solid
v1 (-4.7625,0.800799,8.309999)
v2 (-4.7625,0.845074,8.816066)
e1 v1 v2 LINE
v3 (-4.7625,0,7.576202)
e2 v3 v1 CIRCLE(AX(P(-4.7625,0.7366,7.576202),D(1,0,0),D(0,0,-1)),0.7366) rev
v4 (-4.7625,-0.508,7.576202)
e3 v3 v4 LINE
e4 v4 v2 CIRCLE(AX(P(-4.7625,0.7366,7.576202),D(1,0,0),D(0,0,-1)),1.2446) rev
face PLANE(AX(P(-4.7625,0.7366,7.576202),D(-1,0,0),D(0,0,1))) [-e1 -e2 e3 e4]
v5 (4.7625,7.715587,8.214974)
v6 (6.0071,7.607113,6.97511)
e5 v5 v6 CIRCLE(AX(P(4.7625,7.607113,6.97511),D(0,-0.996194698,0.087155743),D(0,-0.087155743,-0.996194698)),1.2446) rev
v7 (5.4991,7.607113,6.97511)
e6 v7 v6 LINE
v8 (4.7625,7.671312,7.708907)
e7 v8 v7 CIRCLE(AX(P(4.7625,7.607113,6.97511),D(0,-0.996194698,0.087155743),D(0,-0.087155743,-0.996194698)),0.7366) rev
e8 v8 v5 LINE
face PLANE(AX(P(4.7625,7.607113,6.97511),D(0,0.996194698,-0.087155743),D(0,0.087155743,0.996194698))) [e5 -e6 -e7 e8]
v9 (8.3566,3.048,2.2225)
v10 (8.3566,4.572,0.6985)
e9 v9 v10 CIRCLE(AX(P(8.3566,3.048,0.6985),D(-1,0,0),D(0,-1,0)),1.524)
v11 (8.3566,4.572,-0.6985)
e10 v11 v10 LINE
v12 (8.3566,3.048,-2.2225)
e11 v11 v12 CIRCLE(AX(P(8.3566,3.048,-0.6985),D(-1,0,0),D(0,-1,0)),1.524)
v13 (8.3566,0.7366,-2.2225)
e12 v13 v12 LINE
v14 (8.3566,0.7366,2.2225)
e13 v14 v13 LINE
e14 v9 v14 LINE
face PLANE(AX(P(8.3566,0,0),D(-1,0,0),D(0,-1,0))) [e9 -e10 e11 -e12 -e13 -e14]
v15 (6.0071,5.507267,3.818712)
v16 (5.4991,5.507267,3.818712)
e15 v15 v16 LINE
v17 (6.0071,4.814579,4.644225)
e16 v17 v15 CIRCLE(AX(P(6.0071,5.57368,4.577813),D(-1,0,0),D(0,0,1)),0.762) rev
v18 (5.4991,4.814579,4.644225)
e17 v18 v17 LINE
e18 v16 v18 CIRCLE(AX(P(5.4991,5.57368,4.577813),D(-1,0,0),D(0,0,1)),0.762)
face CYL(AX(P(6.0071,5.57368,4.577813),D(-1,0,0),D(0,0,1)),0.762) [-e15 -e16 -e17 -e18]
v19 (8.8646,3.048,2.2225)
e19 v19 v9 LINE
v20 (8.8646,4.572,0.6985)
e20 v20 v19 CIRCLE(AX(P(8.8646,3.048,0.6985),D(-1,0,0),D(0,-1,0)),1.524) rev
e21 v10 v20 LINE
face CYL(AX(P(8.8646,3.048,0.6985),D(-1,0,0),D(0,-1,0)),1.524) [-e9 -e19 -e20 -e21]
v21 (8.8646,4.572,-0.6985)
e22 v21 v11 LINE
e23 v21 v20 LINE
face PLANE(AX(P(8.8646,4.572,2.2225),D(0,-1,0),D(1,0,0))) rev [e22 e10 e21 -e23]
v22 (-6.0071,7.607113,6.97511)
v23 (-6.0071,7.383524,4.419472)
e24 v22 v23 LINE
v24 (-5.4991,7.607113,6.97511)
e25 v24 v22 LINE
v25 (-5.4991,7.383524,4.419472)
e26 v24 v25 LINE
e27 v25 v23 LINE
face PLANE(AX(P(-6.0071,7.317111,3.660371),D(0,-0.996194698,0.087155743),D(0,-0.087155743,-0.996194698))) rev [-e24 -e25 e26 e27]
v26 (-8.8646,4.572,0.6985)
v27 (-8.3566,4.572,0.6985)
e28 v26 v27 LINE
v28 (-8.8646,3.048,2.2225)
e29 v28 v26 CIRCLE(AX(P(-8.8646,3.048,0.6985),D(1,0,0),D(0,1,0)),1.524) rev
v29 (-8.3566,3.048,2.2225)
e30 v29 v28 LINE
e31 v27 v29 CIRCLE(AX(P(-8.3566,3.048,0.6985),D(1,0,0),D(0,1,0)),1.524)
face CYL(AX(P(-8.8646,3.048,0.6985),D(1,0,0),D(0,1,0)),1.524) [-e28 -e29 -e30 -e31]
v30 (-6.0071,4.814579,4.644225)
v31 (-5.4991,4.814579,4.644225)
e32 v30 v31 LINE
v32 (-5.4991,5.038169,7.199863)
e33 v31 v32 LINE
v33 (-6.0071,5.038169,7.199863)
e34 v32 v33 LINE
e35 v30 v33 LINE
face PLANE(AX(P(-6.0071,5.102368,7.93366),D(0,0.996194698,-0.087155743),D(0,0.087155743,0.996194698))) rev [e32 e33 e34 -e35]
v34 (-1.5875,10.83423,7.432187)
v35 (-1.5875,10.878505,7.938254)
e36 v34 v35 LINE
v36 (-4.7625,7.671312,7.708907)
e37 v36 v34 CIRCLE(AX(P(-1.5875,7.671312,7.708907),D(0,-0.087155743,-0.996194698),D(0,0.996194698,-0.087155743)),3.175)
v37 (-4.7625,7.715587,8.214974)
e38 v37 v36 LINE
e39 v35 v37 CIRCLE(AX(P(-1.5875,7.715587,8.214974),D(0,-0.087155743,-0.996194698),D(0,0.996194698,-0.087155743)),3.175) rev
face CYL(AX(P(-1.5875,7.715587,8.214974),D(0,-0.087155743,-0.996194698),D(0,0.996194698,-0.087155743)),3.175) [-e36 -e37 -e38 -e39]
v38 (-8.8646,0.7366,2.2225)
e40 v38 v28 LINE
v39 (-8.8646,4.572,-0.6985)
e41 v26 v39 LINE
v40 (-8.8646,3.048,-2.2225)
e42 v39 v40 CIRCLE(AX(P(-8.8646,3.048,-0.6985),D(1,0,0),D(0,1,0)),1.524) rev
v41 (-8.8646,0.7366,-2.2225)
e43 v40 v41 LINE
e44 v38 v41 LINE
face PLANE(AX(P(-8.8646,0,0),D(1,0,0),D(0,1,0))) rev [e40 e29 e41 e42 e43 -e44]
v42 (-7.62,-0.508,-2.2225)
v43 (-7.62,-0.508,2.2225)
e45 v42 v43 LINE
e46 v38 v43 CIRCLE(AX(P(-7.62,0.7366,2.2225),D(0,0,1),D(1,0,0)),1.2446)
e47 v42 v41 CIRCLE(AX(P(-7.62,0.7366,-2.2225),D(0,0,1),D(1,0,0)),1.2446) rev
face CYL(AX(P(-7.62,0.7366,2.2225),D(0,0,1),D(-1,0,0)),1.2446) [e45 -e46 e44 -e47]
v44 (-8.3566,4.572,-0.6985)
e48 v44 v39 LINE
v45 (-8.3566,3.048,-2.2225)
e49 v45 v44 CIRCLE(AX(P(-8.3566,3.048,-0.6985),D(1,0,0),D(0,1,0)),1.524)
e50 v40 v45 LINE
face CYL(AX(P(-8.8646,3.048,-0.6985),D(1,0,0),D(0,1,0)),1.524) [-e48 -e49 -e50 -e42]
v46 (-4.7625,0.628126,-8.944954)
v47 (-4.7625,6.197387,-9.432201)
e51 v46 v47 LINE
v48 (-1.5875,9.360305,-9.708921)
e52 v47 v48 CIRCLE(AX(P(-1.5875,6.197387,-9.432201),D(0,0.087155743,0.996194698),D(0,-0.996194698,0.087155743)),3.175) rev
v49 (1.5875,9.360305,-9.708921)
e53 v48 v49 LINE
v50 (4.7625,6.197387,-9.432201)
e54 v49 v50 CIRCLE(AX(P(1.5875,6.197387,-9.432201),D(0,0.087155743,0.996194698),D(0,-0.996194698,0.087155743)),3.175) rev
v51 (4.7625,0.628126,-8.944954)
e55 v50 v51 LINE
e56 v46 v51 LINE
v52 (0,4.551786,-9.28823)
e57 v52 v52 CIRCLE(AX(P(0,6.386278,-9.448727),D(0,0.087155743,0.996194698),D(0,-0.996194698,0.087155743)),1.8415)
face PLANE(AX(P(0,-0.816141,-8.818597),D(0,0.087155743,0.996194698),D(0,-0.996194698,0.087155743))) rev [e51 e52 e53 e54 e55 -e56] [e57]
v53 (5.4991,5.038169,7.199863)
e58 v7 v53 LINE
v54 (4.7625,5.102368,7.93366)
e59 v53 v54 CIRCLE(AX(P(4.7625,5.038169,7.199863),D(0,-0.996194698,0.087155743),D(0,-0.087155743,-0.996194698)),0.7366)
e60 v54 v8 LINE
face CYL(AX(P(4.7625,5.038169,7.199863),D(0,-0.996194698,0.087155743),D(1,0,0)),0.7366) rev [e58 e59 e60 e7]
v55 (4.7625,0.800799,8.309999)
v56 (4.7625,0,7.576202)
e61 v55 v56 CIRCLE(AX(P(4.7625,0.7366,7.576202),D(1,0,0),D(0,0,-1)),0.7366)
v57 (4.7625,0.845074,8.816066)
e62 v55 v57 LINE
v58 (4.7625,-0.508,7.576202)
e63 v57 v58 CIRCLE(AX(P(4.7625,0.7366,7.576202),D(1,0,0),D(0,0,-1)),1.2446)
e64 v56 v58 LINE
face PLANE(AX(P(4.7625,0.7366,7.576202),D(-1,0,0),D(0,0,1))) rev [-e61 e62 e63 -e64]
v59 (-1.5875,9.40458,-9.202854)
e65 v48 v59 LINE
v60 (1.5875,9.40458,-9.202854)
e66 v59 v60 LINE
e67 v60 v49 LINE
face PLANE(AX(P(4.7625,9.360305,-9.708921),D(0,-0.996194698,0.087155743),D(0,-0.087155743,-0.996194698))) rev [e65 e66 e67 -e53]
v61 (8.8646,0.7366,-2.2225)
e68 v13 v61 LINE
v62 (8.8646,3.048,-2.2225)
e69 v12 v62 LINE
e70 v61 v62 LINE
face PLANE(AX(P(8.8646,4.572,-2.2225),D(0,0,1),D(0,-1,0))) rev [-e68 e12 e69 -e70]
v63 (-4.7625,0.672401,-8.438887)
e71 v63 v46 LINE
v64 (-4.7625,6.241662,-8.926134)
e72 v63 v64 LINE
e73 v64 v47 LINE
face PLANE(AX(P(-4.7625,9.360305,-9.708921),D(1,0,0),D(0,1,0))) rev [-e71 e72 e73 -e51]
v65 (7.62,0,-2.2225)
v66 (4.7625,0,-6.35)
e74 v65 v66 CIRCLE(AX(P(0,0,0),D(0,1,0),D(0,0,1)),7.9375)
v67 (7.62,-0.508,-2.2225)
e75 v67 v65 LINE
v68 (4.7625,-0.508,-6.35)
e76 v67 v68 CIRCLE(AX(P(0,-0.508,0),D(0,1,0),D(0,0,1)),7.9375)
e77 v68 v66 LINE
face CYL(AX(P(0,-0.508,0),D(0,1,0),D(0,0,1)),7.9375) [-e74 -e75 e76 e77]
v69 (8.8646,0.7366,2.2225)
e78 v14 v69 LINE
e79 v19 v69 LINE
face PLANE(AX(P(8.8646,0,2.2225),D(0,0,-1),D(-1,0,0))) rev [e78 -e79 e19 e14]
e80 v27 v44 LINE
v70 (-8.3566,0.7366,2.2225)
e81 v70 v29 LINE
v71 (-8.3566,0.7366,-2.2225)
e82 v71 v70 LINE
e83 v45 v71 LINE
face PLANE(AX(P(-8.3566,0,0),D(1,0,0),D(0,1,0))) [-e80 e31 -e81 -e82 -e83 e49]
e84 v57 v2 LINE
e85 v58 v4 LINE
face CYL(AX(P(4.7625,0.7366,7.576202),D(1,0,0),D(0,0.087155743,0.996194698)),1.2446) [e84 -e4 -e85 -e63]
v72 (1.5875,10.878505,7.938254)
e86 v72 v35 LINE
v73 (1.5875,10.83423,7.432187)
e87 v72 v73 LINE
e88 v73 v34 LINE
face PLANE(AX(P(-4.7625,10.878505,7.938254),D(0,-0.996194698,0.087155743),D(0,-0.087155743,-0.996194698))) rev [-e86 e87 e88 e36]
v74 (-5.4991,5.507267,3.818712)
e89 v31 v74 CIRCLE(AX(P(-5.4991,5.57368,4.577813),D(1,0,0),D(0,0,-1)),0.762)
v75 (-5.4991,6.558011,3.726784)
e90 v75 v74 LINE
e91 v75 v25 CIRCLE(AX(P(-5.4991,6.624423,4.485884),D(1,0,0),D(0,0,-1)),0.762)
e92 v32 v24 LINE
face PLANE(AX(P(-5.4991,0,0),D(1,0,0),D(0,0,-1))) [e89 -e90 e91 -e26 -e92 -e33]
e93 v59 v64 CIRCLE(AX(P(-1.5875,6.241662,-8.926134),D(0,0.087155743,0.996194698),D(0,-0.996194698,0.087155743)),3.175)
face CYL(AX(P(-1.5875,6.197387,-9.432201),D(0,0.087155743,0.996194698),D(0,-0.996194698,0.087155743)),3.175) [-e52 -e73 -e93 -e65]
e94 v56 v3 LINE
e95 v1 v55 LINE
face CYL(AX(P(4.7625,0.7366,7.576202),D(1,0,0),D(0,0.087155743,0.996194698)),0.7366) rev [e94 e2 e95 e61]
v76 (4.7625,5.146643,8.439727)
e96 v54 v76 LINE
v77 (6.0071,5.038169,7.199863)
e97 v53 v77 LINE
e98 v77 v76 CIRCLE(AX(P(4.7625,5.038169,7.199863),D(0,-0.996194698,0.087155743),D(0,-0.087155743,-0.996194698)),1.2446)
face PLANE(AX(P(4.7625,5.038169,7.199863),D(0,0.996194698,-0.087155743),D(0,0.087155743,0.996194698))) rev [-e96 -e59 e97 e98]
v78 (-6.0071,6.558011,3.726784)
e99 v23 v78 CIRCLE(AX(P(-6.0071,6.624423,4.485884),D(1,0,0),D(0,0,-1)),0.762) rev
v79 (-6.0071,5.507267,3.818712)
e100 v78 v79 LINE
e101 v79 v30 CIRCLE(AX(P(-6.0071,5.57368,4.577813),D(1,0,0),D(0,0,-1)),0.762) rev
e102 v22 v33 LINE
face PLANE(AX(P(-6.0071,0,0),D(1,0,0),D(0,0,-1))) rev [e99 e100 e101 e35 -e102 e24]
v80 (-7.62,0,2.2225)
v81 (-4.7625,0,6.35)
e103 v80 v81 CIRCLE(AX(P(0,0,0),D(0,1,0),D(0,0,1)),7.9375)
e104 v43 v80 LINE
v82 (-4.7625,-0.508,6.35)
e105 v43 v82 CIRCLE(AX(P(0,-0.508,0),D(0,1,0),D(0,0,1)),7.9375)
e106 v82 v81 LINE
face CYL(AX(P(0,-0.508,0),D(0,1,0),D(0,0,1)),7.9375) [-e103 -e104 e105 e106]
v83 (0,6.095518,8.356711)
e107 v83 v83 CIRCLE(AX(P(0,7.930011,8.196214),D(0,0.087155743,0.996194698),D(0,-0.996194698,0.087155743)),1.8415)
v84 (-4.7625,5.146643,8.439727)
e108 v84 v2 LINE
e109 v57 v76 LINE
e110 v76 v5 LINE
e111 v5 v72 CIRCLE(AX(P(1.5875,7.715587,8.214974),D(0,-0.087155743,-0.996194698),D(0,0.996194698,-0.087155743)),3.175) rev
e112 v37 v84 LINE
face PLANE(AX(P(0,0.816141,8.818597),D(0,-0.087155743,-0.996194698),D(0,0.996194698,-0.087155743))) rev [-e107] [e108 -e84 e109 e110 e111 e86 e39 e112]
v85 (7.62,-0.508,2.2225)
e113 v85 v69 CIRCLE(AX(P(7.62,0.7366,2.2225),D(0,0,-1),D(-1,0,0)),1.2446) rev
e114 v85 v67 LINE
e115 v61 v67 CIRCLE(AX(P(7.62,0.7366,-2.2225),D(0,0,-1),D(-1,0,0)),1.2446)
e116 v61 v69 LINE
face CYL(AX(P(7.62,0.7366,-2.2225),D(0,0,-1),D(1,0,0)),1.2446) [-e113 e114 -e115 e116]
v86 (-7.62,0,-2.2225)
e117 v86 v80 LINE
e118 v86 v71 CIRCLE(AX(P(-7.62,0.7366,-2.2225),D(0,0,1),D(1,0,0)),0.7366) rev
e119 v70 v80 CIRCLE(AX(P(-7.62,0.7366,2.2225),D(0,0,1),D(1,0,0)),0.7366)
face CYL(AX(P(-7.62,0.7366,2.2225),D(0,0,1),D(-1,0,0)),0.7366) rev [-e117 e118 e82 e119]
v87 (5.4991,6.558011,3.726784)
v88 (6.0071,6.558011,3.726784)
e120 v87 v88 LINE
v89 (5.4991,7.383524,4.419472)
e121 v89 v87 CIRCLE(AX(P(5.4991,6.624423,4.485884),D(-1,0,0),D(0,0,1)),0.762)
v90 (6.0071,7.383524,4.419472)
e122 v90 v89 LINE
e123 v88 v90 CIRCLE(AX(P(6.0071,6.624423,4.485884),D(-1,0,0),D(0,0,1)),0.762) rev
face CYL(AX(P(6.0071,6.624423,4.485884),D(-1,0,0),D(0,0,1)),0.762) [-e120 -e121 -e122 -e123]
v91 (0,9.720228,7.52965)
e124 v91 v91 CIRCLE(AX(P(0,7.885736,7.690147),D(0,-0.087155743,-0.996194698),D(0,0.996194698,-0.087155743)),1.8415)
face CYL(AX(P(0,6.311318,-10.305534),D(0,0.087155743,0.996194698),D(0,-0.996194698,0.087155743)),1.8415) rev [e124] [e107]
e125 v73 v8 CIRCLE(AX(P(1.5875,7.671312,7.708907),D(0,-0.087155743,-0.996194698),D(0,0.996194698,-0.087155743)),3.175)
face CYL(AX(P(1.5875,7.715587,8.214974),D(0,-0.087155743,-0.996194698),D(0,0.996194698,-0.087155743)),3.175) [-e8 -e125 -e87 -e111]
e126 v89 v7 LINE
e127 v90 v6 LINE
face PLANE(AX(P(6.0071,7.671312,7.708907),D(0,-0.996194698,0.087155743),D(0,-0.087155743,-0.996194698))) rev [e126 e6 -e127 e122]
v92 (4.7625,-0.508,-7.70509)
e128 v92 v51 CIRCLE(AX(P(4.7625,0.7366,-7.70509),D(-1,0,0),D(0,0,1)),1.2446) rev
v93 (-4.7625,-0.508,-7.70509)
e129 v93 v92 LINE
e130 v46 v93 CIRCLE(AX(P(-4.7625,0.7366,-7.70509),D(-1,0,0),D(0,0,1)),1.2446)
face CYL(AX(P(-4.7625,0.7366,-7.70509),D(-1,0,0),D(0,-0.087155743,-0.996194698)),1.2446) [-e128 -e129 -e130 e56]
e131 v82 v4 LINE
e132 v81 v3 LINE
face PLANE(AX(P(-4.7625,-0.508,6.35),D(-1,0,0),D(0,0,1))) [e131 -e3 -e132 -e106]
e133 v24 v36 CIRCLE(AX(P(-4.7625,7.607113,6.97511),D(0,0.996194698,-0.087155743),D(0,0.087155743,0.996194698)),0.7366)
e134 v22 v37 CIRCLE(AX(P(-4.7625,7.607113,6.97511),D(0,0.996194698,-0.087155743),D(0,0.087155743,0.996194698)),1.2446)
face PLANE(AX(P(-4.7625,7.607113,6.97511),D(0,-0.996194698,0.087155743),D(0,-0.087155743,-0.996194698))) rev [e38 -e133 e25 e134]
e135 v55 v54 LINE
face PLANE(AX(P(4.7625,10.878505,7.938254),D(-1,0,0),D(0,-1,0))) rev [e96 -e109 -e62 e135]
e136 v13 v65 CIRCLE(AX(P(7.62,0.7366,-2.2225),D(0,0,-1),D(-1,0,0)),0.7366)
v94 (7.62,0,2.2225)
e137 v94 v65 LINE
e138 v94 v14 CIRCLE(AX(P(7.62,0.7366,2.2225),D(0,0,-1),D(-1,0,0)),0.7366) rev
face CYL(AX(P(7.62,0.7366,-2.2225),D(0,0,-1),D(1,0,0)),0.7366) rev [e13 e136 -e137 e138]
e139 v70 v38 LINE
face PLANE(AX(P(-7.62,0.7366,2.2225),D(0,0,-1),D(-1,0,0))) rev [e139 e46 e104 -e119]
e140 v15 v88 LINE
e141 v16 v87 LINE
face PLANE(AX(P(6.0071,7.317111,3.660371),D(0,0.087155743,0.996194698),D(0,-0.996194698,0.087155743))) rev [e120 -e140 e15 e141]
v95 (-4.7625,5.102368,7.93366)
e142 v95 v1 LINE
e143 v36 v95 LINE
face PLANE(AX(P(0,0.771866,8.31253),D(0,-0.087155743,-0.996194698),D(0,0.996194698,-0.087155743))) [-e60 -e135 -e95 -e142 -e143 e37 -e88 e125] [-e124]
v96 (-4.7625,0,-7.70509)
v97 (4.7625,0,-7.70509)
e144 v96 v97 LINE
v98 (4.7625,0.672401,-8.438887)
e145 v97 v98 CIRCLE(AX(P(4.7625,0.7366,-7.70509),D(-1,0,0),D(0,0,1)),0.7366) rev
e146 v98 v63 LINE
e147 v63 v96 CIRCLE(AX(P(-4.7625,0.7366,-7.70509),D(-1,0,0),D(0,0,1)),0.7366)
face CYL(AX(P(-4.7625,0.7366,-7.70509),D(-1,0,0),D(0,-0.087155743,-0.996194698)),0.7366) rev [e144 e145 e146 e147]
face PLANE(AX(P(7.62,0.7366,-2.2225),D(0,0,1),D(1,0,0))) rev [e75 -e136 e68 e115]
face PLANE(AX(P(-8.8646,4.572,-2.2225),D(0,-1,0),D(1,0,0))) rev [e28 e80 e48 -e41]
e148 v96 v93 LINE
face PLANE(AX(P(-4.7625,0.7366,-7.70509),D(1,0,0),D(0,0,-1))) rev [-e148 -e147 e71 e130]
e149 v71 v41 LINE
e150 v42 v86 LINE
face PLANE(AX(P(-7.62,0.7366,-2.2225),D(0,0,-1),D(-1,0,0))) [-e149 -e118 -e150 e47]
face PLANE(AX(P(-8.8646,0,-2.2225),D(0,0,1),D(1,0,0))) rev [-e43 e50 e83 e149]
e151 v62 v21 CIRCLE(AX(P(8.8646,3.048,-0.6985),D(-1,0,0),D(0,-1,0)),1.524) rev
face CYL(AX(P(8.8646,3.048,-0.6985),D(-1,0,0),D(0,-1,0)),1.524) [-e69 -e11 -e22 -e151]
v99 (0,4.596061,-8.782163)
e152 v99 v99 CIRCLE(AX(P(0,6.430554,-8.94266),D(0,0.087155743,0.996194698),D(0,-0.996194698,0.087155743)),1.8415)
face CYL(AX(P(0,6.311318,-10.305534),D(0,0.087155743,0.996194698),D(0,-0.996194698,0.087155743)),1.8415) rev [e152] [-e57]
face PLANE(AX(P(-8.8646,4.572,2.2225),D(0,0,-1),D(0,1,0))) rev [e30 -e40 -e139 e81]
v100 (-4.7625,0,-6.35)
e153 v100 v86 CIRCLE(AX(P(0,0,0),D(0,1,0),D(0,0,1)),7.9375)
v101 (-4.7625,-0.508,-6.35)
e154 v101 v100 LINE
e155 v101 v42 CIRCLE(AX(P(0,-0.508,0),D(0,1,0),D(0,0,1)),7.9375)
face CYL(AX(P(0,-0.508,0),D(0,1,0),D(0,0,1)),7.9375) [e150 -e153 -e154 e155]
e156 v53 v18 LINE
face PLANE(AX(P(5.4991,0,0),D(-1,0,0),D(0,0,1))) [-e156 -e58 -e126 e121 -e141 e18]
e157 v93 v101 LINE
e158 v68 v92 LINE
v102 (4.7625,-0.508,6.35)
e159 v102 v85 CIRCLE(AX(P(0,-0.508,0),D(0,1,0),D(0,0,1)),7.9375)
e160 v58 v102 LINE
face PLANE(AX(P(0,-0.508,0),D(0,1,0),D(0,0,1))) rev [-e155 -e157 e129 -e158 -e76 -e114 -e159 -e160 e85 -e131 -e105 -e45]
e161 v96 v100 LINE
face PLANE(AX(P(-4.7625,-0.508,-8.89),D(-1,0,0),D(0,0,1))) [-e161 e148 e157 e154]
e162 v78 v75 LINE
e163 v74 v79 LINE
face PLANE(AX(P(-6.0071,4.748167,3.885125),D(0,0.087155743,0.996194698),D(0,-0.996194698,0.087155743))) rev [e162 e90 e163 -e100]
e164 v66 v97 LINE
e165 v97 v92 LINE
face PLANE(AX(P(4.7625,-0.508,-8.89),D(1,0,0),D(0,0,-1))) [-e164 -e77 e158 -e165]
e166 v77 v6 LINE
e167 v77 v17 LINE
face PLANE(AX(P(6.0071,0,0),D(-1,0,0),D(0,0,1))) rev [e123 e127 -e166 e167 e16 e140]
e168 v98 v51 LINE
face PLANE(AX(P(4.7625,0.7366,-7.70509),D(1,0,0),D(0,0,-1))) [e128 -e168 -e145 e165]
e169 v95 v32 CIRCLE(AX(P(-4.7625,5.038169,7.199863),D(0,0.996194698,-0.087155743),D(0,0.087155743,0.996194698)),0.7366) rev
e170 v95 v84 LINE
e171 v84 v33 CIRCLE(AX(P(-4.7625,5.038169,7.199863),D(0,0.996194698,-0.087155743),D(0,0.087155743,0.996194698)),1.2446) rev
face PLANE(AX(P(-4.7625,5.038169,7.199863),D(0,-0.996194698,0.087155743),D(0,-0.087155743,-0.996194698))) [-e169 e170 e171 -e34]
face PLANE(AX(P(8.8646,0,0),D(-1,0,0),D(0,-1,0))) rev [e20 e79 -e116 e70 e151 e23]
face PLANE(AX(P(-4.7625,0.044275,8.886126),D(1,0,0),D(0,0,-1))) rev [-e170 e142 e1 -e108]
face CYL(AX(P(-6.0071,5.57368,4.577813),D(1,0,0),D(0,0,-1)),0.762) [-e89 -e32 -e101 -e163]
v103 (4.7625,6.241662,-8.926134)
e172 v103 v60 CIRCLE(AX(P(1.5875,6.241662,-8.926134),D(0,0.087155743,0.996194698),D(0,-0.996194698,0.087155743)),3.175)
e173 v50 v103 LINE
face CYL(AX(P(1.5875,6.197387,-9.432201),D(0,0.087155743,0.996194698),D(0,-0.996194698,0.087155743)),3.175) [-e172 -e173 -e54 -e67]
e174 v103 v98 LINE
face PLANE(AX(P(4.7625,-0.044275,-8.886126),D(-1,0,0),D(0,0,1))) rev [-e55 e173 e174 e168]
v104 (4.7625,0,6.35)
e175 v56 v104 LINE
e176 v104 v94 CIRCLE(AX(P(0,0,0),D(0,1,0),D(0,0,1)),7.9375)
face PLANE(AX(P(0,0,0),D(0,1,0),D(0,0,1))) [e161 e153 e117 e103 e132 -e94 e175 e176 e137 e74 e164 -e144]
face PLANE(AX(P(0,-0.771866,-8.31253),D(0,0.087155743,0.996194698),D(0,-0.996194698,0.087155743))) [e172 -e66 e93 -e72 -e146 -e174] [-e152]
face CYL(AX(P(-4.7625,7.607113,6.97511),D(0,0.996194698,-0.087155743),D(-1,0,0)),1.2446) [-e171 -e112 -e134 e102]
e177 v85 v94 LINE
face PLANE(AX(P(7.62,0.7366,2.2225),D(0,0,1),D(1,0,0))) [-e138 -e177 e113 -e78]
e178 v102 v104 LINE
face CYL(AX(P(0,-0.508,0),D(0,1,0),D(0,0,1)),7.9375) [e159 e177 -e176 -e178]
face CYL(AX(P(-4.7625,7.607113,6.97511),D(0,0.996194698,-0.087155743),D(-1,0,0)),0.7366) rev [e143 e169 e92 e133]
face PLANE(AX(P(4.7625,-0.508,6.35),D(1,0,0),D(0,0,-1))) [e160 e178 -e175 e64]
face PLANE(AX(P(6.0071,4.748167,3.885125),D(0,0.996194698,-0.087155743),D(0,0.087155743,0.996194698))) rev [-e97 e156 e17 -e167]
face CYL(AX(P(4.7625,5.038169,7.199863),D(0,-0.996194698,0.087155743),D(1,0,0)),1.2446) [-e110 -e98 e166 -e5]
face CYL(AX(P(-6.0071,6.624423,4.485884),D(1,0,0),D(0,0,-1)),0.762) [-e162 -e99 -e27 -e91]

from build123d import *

# Parameters (mm, degrees)
BASE_FLANGE1_DEPTH      = 0.508
EDGE_FLANGE2_START      = -4.7625
EDGE_FLANGE2_DEPTH      = 9.525
EDGE_FLANGE2_2_DEPTH    = 9.525
EDGE_FLANGE3_START      = -4.7625
EDGE_FLANGE3_DEPTH      = 9.525
EDGE_FLANGE3_2_DEPTH    = 9.525
FILLET1_R               = 3.175
SKETCH17_R              = 1.8415
CUT_EXTRUDE1_DEPTH      = 23.441501951
EDGE_FLANGE4_DEPTH      = 4.445
EDGE_FLANGE4_BEND_DEPTH = 4.445
FILLET2_R               = 1.524
EDGE_FLANGE5_DEPTH      = 2.57875744
EDGE_FLANGE5_BEND_DEPTH = 2.57875744
FILLET3_R               = 0.762


# Read off the part's stored shape, not the designer's step: Edge-Flange2, Edge-Flange3
# Sheet-metal steps are written as plain solids
with BuildPart() as part:
    # Sketch1 → Base-Flange1 (new body)
    with BuildSketch(Plane(origin=(0, 0, 0), x_dir=(1, 0, 0), z_dir=(0, 1, 0))):
        with BuildLine():
            Line((-4.7625, -6.35), (-4.7625, -8.89))
            Line((-4.7625, -8.89), (4.7625, -8.89))
            Line((4.7625, -8.89), (4.7625, -6.35))
            ThreePointArc((4.7625, -6.35), (6.526150521, -4.518104207), (7.62, -2.2225))
            Line((7.62, -2.2225), (7.62, 2.2225))
            ThreePointArc((7.62, 2.2225), (6.526150521, 4.518104207), (4.7625, 6.35))
            Line((4.7625, 6.35), (4.7625, 8.89))
            Line((4.7625, 8.89), (-4.7625, 8.89))
            Line((-4.7625, 8.89), (-4.7625, 6.35))
            ThreePointArc((-4.7625, 6.35), (-6.526150521, 4.518104207), (-7.62, 2.2225))
            Line((-7.62, 2.2225), (-7.62, -2.2225))
            ThreePointArc((-7.62, -2.2225), (-6.526150521, -4.518104207), (-4.7625, -6.35))
        make_face()
    extrude(amount=-BASE_FLANGE1_DEPTH)

    # Edge-Flange2 outline → Edge-Flange2 (cut)
    with BuildSketch(Plane.YZ.offset(EDGE_FLANGE2_START)):
        with BuildLine():
            Line((0, -8.89), (0, -8.708309596))
            ThreePointArc((0, -8.708309596), (-0.373760644, -8.267342948), (-0.508, -7.70508998))
            Line((-0.508, -7.70508998), (-0.508, -8.89))
            Line((-0.508, -8.89), (0, -8.89))
        make_face()
    extrude(amount=EDGE_FLANGE2_DEPTH, mode=Mode.SUBTRACT)

    # Edge-Flange2 2 outline → Edge-Flange2 2 (add)
    with BuildSketch(Plane.YZ.offset(EDGE_FLANGE2_START)):
        with BuildLine():
            ThreePointArc((0, -8.708309596), (0.297808861, -8.869775128), (0.628125963, -8.944953901))
            Line((0.628125963, -8.944953901), (9.360304679, -9.708920547))
            Line((9.360304679, -9.708920547), (9.404579797, -9.20285364))
            Line((9.404579797, -9.20285364), (0.67240108, -8.438886994))
            ThreePointArc((0.67240108, -8.438886994), (0.193521514, -8.202729727), (0, -7.70508998))
            Line((0, -7.70508998), (0, -8.708309596))
        make_face()
    extrude(amount=EDGE_FLANGE2_2_DEPTH)

    # Edge-Flange3 outline → Edge-Flange3 (cut)
    with BuildSketch(Plane.YZ.offset(EDGE_FLANGE3_START)):
        with BuildLine():
            ThreePointArc((-0.508, 7.576201681), (-0.373760644, 8.138454649), (0, 8.579421297))
            Line((0, 8.579421297), (0, 8.89))
            Line((0, 8.89), (-0.508, 8.89))
            Line((-0.508, 8.89), (-0.508, 7.576201681))
        make_face()
    extrude(amount=EDGE_FLANGE3_DEPTH, mode=Mode.SUBTRACT)

    # Edge-Flange3 2 outline → Edge-Flange3 2 (add)
    with BuildSketch(Plane.YZ.offset(EDGE_FLANGE3_START)):
        with BuildLine():
            Line((10.878505399, 7.938254101), (0.845074037, 8.816065602))
            ThreePointArc((0.845074037, 8.816065602), (0.400987593, 8.774698018), (0, 8.579421297))
            Line((0, 8.579421297), (0, 7.576201681))
            ThreePointArc((0, 7.576201681), (0.238960253, 8.119280167), (0.80079892, 8.309998695))
            Line((0.80079892, 8.309998695), (10.834230282, 7.432187195))
            Line((10.834230282, 7.432187195), (10.878505399, 7.938254101))
        make_face()
    extrude(amount=EDGE_FLANGE3_2_DEPTH)

    # Fillet1
    fillet1_edges = [part.edges().sort_by_distance(p)[0] for p in [
        (4.7625, 9.382442238, -9.455887093),
        (-4.7625, 9.382442238, -9.455887093),
        (-4.7625, 10.85636784, 7.685220648),
        (4.7625, 10.85636784, 7.685220648),
    ]]
    fillet(fillet1_edges, radius=FILLET1_R)

    # Sketch17 → Cut-Extrude1 (cut, through all)
    with BuildSketch(Plane(origin=(0, 0.77186615, 8.822470462), x_dir=(1, 0, 0), z_dir=(0, 0.08715574274765484, 0.9961946980917459))):
        with Locations(Location((0, 7.18548753, 0), (0, 0, 270))):
            Circle(SKETCH17_R)
    extrude(amount=-CUT_EXTRUDE1_DEPTH, mode=Mode.SUBTRACT)

    # Edge-Flange4 section (across the edge) → Edge-Flange4 (add)
    with BuildSketch(Plane(origin=(-8.3566, 0, -2.2225), x_dir=(1, 0, 0), z_dir=(0, 0, 1))):
        with BuildLine():
            Line((-0.508, 0.7366), (-0.508, 4.572))
            Line((-0.508, 4.572), (0, 4.572))
            Line((0, 4.572), (0, 0.7366))
            ThreePointArc((0, 0.7366), (0.215745145, 0.215745145), (0.7366, 0))
            Line((0.7366, 0), (0.7366, -0.508))
            ThreePointArc((0.7366, -0.508), (-0.1434651, -0.1434651), (-0.508, 0.7366))
        make_face()
    extrude(amount=EDGE_FLANGE4_DEPTH)

    # Edge-Flange4 section 2 (across the edge) → Edge-Flange4 bend (add)
    with BuildSketch(Plane(origin=(8.3566, 0, 2.2225), x_dir=(-1, 0, 0), z_dir=(0, 0, -1))):
        with BuildLine():
            Line((-0.508, 0.7366), (-0.508, 4.572))
            Line((-0.508, 4.572), (0, 4.572))
            Line((0, 4.572), (0, 0.7366))
            ThreePointArc((0, 0.7366), (0.215745145, 0.215745145), (0.7366, 0))
            Line((0.7366, 0), (0.7366, -0.508))
            ThreePointArc((0.7366, -0.508), (-0.1434651, -0.1434651), (-0.508, 0.7366))
        make_face()
    extrude(amount=EDGE_FLANGE4_BEND_DEPTH)

    # Fillet2
    fillet2_edges = [part.edges().sort_by_distance(p)[0] for p in [
        (-8.6106, 4.572, -2.2225),
        (-8.6106, 4.572, 2.2225),
        (8.6106, 4.572, 2.2225),
        (8.6106, 4.572, -2.2225),
    ]]
    fillet(fillet2_edges, radius=FILLET2_R)

    # Edge-Flange5 section (across the edge) → Edge-Flange5 (add)
    with BuildSketch(Plane(origin=(-5.4991, 5.102367626, 7.933660198), x_dir=(1, 0, 0), z_dir=(0, 0.9961946980917459, -0.08715574274765468))):
        with BuildLine():
            Line((-0.508, 0.7366), (-0.508, 4.064))
            Line((-0.508, 4.064), (0, 4.064))
            Line((0, 4.064), (0, 0.7366))
            ThreePointArc((0, 0.7366), (0.215745145, 0.215745145), (0.7366, 0))
            Line((0.7366, 0), (0.7366, -0.508))
            ThreePointArc((0.7366, -0.508), (-0.1434651, -0.1434651), (-0.508, 0.7366))
        make_face()
    extrude(amount=EDGE_FLANGE5_DEPTH)

    # Edge-Flange5 section 2 (across the edge) → Edge-Flange5 bend (add)
    with BuildSketch(Plane(origin=(5.4991, 7.671312115, 7.708906678), x_dir=(-1, 0, 0), z_dir=(0, -0.9961946980917459, 0.08715574274765468))):
        with BuildLine():
            Line((-0.508, 0.7366), (-0.508, 4.064))
            Line((-0.508, 4.064), (0, 4.064))
            Line((0, 4.064), (0, 0.7366))
            ThreePointArc((0, 0.7366), (0.215745145, 0.215745145), (0.7366, 0))
            Line((0.7366, 0), (0.7366, -0.508))
            ThreePointArc((0.7366, -0.508), (-0.1434651, -0.1434651), (-0.508, 0.7366))
        make_face()
    extrude(amount=EDGE_FLANGE5_BEND_DEPTH)

    # Fillet3
    fillet3_edges = [part.edges().sort_by_distance(p)[0] for p in [
        (-5.7531, 4.748166688, 3.885124945),
        (-5.7531, 7.317111177, 3.660371425),
        (5.7531, 7.317111177, 3.660371425),
        (5.7531, 4.748166688, 3.885124945),
    ]]
    fillet(fillet3_edges, radius=FILLET3_R)


solid = part.part
